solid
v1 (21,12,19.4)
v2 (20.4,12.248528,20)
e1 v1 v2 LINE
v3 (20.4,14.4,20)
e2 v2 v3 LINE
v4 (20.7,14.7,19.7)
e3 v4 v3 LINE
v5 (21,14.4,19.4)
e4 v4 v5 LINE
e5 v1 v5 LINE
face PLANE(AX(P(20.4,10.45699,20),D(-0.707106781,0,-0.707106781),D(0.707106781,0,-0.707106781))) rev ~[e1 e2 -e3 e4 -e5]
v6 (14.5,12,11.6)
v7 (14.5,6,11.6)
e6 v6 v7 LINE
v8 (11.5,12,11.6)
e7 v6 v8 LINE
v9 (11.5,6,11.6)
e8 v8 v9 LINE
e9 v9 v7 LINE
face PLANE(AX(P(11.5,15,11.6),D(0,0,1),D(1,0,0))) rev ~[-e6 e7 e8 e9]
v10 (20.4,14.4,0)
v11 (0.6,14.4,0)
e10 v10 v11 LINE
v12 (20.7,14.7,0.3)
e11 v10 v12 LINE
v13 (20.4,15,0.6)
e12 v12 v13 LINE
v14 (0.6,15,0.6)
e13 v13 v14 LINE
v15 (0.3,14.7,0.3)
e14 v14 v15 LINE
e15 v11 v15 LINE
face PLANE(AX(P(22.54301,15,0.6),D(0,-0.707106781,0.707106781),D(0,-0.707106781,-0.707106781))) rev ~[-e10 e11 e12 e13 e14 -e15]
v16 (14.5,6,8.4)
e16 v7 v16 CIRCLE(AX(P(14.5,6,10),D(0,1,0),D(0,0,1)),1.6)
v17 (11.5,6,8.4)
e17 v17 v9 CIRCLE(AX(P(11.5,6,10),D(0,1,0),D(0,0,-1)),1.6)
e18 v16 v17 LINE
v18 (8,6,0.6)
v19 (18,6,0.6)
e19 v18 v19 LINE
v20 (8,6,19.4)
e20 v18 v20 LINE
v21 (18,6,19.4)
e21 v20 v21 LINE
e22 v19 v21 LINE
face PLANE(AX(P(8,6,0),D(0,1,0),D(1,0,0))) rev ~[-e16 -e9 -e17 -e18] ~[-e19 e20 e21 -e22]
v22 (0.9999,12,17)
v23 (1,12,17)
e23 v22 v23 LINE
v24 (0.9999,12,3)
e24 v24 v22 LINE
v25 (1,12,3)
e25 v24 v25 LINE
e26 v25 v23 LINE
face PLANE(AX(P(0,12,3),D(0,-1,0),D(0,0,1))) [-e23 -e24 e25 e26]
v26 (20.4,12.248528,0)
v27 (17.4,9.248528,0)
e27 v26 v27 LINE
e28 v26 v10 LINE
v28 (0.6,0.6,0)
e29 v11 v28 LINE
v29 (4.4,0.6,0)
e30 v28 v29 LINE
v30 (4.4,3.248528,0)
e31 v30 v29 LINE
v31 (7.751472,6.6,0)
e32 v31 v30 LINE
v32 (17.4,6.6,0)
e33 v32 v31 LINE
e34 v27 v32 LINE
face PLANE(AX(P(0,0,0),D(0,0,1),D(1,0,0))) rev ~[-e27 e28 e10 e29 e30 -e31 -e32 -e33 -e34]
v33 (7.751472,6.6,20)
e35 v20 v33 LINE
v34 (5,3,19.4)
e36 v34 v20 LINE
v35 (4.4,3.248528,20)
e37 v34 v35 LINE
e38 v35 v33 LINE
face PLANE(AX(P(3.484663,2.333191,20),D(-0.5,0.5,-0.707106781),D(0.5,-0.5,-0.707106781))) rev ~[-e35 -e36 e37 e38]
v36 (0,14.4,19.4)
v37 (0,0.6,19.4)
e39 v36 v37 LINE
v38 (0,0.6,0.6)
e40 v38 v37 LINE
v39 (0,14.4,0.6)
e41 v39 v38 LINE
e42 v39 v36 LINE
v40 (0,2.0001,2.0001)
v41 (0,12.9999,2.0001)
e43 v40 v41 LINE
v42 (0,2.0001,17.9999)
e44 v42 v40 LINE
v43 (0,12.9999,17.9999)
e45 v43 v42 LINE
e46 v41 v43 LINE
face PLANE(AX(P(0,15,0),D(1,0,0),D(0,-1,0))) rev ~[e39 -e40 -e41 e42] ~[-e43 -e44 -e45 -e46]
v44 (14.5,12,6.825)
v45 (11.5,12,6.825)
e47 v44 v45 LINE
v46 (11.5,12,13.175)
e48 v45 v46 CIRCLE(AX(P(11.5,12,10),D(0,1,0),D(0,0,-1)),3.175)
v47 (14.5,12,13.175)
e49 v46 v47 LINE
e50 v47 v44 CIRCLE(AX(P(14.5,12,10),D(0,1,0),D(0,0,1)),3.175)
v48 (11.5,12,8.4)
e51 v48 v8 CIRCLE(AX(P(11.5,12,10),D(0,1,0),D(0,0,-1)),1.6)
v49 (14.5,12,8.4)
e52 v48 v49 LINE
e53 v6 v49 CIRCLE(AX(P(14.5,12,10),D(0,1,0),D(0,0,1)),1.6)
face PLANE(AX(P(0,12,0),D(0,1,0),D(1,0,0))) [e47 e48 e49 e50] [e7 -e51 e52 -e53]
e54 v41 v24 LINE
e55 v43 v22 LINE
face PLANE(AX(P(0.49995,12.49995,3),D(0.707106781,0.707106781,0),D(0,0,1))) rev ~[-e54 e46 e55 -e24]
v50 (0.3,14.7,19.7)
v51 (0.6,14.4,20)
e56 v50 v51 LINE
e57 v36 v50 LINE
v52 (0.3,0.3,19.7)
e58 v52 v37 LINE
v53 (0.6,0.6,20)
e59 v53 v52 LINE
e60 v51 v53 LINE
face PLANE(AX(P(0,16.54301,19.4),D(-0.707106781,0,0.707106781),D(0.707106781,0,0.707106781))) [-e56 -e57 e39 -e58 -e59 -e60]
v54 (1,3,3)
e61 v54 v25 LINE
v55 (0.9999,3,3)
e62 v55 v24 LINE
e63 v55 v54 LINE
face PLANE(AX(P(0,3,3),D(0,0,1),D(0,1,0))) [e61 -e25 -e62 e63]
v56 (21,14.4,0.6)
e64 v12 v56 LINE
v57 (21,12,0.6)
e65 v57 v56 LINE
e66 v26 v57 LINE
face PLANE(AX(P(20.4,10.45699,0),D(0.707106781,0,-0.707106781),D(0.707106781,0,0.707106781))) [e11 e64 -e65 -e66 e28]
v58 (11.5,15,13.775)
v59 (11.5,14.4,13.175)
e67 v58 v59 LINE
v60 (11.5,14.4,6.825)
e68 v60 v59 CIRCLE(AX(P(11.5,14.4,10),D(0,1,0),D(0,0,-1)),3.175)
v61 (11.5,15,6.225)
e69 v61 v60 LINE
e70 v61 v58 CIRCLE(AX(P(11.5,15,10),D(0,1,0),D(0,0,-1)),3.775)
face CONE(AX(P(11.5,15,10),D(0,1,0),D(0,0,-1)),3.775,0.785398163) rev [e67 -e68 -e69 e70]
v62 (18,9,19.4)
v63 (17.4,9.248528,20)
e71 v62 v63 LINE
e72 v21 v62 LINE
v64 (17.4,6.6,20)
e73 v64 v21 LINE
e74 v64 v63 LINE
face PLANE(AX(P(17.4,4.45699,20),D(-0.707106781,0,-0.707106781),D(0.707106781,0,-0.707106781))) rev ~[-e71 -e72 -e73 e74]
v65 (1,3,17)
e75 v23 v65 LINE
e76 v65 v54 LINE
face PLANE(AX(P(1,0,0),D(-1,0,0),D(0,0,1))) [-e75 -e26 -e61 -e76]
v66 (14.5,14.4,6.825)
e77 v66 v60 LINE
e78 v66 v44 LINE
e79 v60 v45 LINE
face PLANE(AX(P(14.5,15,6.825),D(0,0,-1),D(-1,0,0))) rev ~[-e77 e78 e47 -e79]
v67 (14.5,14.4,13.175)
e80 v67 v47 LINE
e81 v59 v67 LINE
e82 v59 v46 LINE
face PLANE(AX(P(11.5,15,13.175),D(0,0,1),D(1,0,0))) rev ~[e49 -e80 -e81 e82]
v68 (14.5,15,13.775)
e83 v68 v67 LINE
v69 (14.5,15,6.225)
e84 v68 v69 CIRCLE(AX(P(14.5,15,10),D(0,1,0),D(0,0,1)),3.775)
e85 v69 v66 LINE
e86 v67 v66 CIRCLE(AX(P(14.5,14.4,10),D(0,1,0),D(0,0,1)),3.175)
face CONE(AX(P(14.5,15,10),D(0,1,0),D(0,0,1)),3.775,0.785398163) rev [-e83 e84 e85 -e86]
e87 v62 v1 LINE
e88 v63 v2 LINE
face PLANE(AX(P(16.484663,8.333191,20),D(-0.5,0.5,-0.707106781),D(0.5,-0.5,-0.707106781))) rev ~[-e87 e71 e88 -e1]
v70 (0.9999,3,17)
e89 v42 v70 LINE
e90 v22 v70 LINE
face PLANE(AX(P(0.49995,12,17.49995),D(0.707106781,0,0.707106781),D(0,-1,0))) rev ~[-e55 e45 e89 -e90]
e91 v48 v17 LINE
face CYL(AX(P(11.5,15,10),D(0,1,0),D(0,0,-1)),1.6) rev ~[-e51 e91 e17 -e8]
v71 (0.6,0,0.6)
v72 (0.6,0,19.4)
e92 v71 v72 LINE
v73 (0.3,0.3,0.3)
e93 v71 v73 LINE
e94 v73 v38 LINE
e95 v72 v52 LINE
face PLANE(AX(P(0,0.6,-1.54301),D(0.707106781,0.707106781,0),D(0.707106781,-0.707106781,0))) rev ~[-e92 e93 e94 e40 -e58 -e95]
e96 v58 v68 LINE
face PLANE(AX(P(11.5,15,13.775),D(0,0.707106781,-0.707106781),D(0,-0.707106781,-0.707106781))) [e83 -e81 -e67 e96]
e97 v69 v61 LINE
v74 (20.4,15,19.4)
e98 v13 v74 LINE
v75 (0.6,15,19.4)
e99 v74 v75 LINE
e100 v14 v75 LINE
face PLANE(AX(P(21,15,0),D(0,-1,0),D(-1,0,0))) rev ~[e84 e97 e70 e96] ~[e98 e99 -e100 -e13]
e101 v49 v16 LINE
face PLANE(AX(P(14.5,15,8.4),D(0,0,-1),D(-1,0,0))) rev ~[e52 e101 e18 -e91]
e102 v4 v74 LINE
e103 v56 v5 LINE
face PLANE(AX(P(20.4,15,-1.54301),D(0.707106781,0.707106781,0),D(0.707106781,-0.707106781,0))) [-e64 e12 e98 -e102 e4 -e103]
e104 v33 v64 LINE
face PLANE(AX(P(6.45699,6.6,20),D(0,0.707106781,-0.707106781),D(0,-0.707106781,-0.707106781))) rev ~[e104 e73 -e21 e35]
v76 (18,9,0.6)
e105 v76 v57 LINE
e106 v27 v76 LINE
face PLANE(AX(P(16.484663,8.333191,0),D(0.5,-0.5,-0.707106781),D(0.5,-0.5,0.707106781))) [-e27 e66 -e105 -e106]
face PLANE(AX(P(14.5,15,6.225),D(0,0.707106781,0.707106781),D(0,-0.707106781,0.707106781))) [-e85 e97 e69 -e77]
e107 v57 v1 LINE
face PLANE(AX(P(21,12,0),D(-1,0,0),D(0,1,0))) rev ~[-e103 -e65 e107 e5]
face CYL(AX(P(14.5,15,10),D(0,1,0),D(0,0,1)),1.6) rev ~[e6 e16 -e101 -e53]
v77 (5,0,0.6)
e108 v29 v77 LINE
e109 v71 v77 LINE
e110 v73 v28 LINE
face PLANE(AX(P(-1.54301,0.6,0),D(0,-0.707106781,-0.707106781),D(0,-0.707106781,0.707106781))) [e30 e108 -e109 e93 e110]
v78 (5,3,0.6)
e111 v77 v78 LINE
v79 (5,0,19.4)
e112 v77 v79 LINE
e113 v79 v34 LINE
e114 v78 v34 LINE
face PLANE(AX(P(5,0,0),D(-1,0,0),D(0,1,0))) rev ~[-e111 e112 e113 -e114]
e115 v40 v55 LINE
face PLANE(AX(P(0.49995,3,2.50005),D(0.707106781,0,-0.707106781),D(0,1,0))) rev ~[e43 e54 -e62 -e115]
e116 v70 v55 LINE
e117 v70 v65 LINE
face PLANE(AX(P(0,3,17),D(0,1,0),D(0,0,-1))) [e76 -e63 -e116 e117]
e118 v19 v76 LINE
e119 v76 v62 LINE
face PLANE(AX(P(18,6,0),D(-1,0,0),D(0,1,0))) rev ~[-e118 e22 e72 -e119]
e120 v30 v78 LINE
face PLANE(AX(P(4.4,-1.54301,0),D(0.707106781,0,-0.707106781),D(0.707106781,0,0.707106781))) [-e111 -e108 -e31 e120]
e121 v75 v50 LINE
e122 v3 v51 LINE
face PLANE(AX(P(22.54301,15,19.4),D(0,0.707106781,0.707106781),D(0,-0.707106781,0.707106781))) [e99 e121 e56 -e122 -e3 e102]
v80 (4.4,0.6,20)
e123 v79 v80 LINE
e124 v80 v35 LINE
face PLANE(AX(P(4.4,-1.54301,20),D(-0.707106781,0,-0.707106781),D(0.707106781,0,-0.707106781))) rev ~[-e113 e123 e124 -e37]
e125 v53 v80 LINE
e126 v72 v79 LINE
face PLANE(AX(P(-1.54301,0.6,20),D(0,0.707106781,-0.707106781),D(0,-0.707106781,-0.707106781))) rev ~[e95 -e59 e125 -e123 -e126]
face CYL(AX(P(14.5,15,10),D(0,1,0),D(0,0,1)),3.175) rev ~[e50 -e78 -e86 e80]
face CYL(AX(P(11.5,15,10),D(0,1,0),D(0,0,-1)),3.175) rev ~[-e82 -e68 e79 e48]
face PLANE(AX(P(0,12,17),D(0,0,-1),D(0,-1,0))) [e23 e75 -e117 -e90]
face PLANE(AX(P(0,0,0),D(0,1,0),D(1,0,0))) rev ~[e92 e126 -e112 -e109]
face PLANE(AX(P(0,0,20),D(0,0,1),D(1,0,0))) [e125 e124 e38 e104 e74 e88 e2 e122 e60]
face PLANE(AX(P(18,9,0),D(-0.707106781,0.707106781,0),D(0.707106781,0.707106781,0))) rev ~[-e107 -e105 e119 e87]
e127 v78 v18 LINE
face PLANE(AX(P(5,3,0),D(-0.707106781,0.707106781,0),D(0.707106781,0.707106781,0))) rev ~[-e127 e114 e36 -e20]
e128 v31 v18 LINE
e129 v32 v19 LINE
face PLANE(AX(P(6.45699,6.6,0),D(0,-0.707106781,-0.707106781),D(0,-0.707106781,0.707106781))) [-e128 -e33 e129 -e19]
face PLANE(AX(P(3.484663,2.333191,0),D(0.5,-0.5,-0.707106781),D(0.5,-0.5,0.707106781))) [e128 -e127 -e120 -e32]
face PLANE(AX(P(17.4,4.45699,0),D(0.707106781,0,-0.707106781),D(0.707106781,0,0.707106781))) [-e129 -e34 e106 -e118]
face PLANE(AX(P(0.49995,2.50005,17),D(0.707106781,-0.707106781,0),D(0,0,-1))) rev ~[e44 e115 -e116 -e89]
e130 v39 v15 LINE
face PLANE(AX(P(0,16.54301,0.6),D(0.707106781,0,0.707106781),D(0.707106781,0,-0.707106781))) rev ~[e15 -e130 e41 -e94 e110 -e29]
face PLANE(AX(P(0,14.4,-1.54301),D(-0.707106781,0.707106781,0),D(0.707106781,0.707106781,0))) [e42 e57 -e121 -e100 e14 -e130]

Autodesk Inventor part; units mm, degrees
ref_plane "YZ Plane" through (0, 0, 0) normal (1, 0, 0) x (0, 1, 0)
ref_plane "XZ Plane" through (0, 0, 0) normal (0, 1, 0) x (-1, 0, 0)
ref_plane "XY Plane" through (0, 0, 0) normal (0, 0, 1) x (1, 0, 0)
sketch "Sketch1" plane through (0, 0, 0) normal (0, 0, 1) x (1, 0, 0)
  line L0 (0, 0) -> (5, 0)
  line L1 (5, 0) -> (5, 3)
  line L2 (5, 3) -> (8, 6)
  line L3 (8, 6) -> (18, 6)
  line L4 (21, 15) -> (0, 15)
  line L5 (0, 15) -> (0, 0)
  line L6 (18, 6) -> (18, 9)
  line L7 (18, 9) -> (21, 12)
  line L8 (21, 12) -> (21, 15)
  dimension "d0" = 45
  dimension "d2" = 5
  dimension "d4" = 10
  dimension "d6" = 3
  dimension "d7" = 3
  dimension "d8" = 3
  dimension "d25" = 3
extrude "Extrusion1" add sketch "Sketch1" along normal blind 20
sketch "Sketch2" plane through (0, 15, 0) normal (0, 1, 0) x (1, 0, 0)
  line L0 (9.9, -10) -> (16.1, -10) construction
  line L1 (11.5, -11.6) -> (14.5, -11.6)
  line L2 (14.5, -8.4) -> (11.5, -8.4)
  arc A0 (11.5, -8.4) -> (11.5, -11.6) centre (11.5, -10) ccw
  arc A1 (14.5, -11.6) -> (14.5, -8.4) centre (14.5, -10) ccw
  line L3 (11.5, -10) -> (14.5, -10) construction
  line L4 (11.5, -13.175) -> (14.5, -13.175)
  line L5 (14.5, -6.825) -> (11.5, -6.825)
  arc A2 (11.5, -6.825) -> (11.5, -13.175) centre (11.5, -10) ccw
  arc A3 (14.5, -13.175) -> (14.5, -6.825) centre (14.5, -10) ccw
  line L6 (8, 0) -> (18, 0) construction
  line L7 (18, 0) -> (18, -20) construction
  line L8 (8, -20) -> (18, -20) construction
  line L9 (8, 0) -> (8, -20) construction
  point P0 (13, -10)
  point P1 (8.325, -10)
  point P2 (13, -20)
  point P3 (8, -10)
  dimension "d11" = 3.2
  dimension "d16" = 6.35
  dimension "d24" = 3
extrude "Extrusion2" cut sketch "Sketch2" against normal through all contours A0 L2 A1 L1
extrude "Extrusion3" cut sketch "Sketch2" against normal blind 3 contours A0 L2 A1 L1 | A2 L5 A3 L4
sketch "Sketch3" plane through (0, 0, 0) normal (-1, 0, 0) x (0, 0, 1)
  line L0 (0, 15) -> (0, 0) construction
  line L1 (0, 0) -> (20, 0) construction
  line L2 (20, 15) -> (20, 0) construction
  line L3 (0, 15) -> (20, 15) construction
  line L4 (17, 12) -> (17, 3)
  line L5 (17, 3) -> (3, 3)
  line L6 (3, 3) -> (3, 12)
  line L7 (3, 12) -> (17, 12)
  dimension "d26" = 3
extrude "Extrusion4" cut sketch "Sketch3" against normal blind 1
chamfer "Chamfer1" distance 0.6 angle 45 25 edges at (10.5, 15, 20) (10.5, 15, 0) (0, 15, 10) (0, 7.5, 20) (0, 7.5, 0) (0, 0, 10) (2.5, 0, 20) (2.5, 0, 0) (19.5, 10.5, 20) (18, 7.5, 20) (13, 6, 20) (6.5, 4.5, 20) (5, 1.5, 20) (5, 1.5, 0) (6.5, 4.5, 0) (13, 6, 0) (18, 7.5, 0) (19.5, 10.5, 0) (17.675, 15, 10) (13, 15, 13.175) (8.325, 15, 10) (13, 15, 6.825) (21, 13.5, 20) (21, 13.5, 0) (21, 15, 10)
chamfer "Chamfer2" distance 1 angle 45 4 edges at (0, 7.5, 3) (0, 12, 10) (0, 7.5, 17) (0, 3, 10)
equation "\"d7\" = d6"
equation "\"d8\" = d7"
equation "\"d25\" = d7"
